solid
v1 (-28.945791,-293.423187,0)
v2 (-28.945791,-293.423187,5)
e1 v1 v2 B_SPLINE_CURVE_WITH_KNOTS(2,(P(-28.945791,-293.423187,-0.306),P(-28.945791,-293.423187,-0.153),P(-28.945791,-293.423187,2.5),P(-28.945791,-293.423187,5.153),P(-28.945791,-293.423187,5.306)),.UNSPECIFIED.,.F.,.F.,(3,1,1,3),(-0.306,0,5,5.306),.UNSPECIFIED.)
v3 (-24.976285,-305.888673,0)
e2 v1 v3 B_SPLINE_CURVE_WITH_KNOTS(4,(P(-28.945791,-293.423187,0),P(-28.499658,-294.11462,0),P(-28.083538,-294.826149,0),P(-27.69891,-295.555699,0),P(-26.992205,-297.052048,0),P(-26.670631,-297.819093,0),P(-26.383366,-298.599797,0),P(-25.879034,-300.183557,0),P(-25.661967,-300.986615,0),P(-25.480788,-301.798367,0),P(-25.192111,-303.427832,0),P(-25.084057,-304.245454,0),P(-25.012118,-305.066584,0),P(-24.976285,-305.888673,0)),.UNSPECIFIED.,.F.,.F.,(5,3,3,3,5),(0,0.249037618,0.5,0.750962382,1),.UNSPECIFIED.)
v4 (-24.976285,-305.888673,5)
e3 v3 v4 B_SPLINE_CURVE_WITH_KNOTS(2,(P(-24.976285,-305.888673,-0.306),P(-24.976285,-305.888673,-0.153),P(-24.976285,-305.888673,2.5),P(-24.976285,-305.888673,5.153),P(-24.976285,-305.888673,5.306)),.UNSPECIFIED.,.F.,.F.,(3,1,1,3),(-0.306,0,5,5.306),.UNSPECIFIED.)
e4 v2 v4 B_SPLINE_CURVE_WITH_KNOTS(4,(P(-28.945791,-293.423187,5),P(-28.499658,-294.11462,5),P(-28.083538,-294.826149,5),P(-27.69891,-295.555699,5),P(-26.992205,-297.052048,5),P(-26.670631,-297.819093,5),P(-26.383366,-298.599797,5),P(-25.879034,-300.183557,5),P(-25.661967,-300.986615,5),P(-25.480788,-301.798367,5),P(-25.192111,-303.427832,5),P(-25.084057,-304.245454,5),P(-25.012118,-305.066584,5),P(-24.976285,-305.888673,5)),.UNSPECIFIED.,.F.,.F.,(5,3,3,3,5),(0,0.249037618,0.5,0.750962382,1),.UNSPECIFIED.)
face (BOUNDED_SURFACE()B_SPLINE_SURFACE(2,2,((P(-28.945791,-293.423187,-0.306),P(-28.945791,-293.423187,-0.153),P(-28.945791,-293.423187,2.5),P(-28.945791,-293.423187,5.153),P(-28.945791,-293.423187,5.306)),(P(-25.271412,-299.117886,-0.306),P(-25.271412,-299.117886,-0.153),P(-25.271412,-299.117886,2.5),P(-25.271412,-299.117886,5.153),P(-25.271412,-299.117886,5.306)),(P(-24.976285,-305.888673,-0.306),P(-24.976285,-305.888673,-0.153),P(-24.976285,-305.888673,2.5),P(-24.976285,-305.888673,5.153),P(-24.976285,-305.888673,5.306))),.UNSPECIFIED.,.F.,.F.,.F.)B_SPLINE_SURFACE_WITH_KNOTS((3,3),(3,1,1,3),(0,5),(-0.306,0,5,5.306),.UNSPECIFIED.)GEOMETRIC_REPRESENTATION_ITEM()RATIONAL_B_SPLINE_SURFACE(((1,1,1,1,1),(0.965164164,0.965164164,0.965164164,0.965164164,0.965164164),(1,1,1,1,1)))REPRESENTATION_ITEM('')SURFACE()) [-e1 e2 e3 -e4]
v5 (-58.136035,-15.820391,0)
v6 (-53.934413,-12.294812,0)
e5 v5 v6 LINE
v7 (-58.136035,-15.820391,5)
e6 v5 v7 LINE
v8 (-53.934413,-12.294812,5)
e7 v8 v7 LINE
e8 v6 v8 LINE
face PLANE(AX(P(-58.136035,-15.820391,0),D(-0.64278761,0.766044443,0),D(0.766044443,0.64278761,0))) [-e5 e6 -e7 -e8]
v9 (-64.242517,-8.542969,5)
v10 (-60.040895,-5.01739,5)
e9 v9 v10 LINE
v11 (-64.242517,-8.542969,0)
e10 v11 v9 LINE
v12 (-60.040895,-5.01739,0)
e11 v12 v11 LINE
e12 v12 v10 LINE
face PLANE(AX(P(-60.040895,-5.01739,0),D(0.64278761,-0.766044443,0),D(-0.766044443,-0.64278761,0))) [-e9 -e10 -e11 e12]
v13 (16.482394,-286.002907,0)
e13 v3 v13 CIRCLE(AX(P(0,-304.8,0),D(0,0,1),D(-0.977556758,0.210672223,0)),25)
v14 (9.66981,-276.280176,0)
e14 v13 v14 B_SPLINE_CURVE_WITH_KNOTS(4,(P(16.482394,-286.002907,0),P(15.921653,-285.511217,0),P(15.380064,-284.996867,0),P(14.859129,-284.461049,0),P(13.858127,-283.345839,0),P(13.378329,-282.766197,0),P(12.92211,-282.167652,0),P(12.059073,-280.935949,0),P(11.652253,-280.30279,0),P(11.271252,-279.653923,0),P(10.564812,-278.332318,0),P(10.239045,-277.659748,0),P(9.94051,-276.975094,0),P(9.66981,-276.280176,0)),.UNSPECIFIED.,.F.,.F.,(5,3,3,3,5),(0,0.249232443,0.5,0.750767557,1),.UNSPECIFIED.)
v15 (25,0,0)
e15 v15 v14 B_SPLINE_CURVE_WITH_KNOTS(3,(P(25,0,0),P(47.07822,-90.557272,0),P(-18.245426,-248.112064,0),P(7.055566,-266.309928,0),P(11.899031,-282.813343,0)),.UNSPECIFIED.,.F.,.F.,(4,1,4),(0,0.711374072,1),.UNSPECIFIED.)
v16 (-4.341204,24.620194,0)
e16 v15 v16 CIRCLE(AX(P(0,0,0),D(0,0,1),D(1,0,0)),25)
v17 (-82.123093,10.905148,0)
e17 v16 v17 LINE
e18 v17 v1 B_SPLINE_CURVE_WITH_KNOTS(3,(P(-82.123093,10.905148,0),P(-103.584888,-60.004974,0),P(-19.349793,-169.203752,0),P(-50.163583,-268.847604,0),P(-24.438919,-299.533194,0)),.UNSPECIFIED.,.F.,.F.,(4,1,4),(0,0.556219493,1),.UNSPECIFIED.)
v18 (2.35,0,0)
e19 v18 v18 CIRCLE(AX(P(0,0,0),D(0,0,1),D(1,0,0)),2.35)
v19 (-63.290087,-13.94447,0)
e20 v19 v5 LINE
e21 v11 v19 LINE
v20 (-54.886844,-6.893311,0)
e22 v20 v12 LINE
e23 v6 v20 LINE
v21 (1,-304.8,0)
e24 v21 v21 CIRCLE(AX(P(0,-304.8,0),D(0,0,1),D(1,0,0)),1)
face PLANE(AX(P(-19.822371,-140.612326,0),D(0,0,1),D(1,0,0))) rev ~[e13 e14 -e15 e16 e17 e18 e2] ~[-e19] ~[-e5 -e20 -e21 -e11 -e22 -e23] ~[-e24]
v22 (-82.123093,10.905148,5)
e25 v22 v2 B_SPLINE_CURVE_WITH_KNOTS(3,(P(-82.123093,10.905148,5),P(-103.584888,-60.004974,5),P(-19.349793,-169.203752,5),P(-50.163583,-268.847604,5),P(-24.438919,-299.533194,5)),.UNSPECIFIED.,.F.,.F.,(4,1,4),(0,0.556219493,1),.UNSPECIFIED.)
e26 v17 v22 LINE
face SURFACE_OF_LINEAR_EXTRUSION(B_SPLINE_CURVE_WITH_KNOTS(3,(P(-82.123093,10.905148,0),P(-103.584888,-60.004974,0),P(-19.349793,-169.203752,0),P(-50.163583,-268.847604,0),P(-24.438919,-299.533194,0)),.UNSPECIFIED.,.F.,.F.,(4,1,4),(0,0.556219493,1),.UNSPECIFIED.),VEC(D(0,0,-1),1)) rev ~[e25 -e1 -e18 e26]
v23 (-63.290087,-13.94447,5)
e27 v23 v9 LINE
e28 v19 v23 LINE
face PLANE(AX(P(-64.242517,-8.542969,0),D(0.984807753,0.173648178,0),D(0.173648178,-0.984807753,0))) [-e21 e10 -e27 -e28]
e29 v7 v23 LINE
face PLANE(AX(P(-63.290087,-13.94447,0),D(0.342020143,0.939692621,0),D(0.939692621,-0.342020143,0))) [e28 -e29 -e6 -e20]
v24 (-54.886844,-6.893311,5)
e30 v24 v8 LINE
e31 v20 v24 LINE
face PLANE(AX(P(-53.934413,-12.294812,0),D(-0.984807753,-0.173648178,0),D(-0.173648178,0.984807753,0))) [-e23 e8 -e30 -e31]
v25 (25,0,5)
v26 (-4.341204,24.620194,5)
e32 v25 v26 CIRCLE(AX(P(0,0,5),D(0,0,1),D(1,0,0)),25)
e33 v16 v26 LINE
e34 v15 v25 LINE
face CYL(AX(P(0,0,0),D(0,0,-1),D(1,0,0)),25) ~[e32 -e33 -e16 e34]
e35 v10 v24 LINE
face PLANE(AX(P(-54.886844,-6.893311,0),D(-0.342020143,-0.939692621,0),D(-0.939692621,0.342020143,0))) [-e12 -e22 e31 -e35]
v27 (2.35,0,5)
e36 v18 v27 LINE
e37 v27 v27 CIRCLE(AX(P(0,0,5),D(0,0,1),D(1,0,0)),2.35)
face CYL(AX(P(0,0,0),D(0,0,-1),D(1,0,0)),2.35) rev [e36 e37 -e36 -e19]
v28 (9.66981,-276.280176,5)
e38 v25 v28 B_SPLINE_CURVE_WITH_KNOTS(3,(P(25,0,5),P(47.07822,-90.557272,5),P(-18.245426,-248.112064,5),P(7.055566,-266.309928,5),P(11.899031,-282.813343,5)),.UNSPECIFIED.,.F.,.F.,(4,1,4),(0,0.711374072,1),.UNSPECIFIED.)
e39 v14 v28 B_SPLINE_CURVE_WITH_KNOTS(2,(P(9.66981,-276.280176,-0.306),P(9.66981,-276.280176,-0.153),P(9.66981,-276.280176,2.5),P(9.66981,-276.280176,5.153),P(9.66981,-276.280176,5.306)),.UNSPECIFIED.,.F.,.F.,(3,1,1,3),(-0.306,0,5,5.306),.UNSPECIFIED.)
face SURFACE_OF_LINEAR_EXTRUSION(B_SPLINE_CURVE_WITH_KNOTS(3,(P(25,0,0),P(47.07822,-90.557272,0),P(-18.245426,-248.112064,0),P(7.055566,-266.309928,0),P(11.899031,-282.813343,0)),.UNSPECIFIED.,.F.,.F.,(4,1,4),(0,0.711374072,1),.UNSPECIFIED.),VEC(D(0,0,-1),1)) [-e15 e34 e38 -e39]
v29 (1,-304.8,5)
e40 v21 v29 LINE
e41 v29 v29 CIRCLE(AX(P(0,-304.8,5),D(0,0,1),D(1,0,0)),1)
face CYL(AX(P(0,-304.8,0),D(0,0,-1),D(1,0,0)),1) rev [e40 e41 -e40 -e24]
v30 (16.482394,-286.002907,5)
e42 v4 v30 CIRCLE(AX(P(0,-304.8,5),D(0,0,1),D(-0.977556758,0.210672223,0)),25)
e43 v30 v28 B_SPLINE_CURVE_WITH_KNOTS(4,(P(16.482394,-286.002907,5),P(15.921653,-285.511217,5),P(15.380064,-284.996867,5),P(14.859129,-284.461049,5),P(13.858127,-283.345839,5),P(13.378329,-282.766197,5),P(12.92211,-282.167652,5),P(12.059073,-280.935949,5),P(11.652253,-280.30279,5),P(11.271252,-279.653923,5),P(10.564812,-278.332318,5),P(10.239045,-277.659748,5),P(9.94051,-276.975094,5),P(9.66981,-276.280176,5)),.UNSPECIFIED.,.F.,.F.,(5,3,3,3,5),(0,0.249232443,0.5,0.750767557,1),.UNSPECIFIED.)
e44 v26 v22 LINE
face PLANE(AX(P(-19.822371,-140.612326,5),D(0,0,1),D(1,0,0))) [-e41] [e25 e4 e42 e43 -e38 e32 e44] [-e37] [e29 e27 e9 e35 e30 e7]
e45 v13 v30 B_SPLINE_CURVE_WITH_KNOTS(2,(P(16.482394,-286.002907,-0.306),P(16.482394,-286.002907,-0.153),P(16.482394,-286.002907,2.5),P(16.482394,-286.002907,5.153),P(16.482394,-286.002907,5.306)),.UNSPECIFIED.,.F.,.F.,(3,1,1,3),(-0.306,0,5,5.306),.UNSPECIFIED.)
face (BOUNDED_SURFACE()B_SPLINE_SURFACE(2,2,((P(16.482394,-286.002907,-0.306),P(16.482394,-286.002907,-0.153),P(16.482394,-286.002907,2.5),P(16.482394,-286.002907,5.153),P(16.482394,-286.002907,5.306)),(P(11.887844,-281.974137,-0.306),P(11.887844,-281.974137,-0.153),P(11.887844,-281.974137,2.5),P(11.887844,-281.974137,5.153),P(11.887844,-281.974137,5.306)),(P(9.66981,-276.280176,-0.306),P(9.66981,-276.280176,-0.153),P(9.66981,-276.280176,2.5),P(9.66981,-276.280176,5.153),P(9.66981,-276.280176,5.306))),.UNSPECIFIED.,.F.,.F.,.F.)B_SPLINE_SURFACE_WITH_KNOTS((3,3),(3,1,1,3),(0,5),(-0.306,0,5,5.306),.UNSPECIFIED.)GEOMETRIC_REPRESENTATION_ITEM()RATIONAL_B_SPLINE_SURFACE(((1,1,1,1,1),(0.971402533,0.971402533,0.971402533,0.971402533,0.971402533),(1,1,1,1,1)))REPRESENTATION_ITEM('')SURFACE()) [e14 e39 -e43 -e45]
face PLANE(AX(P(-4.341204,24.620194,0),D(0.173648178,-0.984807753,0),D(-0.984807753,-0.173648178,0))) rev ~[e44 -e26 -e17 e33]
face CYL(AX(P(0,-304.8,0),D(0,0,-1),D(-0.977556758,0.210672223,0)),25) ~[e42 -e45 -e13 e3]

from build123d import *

# Parameters (mm, degrees)
F0_R     = 1
F0_R_2   = 2.35
F2_DEPTH = 5
F3_DEPTH = 5.0010001
F4_R     = 25


with BuildPart() as f2:
    # F0 (on Top) → F2 (new body)
    with BuildSketch(Plane.XY):
        with BuildLine():
            add(Edge.make_bspline(
                [(-82.1230926166, 10.9051483296), (-103.5848878493, -60.0049742057), (-19.3497930189, -169.20375229), (-50.163582636, -268.8476041523), (-24.438918941, -299.5331944222)],
                knots=[0, 0, 0, 0, 0.5562194935, 1, 1, 1, 1], degree=3))
            ThreePointArc((-24.438918941, -299.5331944222), (10.4499069023, -327.5112184995), (11.8990306582, -282.8133433784))
            add(Edge.make_bspline(
                [(25, 0), (47.0782204713, -90.5572716574), (-18.2454262763, -248.1120641616), (7.0555657506, -266.3099283549), (11.8990306582, -282.8133433784)],
                knots=[0, 0, 0, 0, 0.7113740719, 1, 1, 1, 1], degree=3))
            ThreePointArc((25, 0), (16.0696902422, 19.151111078), (-4.3412044417, 24.6201938253))
            Line((-4.3412044417, 24.6201938253), (-82.1230926166, 10.9051483296))
        make_face()
        with Locations((0, -304.8)):
            Circle(F0_R, mode=Mode.SUBTRACT)
        Circle(F0_R_2, mode=Mode.SUBTRACT)
    extrude(amount=F2_DEPTH)

    # F1 (on Top) → F3 (cut, through all)
    with BuildSketch(Plane.XY):
        Polygon((-53.9344131989, -12.2948121673), (-54.886843509, -6.8933114649), (-60.0408954909, -5.0173899577), (-64.2425171626, -8.5429691528), (-63.2900868525, -13.9444698551), (-58.1360348706, -15.8203913624), align=None)
    extrude(amount=F3_DEPTH, mode=Mode.SUBTRACT)

    # F4
    f4_edges = [f2.edges().sort_by_distance(p)[0] for p in [
        (-24.438919, -299.533194, 2.5),
        (11.899031, -282.813343, 2.5),
    ]]
    fillet(f4_edges, radius=F4_R)


solid = f2.part
